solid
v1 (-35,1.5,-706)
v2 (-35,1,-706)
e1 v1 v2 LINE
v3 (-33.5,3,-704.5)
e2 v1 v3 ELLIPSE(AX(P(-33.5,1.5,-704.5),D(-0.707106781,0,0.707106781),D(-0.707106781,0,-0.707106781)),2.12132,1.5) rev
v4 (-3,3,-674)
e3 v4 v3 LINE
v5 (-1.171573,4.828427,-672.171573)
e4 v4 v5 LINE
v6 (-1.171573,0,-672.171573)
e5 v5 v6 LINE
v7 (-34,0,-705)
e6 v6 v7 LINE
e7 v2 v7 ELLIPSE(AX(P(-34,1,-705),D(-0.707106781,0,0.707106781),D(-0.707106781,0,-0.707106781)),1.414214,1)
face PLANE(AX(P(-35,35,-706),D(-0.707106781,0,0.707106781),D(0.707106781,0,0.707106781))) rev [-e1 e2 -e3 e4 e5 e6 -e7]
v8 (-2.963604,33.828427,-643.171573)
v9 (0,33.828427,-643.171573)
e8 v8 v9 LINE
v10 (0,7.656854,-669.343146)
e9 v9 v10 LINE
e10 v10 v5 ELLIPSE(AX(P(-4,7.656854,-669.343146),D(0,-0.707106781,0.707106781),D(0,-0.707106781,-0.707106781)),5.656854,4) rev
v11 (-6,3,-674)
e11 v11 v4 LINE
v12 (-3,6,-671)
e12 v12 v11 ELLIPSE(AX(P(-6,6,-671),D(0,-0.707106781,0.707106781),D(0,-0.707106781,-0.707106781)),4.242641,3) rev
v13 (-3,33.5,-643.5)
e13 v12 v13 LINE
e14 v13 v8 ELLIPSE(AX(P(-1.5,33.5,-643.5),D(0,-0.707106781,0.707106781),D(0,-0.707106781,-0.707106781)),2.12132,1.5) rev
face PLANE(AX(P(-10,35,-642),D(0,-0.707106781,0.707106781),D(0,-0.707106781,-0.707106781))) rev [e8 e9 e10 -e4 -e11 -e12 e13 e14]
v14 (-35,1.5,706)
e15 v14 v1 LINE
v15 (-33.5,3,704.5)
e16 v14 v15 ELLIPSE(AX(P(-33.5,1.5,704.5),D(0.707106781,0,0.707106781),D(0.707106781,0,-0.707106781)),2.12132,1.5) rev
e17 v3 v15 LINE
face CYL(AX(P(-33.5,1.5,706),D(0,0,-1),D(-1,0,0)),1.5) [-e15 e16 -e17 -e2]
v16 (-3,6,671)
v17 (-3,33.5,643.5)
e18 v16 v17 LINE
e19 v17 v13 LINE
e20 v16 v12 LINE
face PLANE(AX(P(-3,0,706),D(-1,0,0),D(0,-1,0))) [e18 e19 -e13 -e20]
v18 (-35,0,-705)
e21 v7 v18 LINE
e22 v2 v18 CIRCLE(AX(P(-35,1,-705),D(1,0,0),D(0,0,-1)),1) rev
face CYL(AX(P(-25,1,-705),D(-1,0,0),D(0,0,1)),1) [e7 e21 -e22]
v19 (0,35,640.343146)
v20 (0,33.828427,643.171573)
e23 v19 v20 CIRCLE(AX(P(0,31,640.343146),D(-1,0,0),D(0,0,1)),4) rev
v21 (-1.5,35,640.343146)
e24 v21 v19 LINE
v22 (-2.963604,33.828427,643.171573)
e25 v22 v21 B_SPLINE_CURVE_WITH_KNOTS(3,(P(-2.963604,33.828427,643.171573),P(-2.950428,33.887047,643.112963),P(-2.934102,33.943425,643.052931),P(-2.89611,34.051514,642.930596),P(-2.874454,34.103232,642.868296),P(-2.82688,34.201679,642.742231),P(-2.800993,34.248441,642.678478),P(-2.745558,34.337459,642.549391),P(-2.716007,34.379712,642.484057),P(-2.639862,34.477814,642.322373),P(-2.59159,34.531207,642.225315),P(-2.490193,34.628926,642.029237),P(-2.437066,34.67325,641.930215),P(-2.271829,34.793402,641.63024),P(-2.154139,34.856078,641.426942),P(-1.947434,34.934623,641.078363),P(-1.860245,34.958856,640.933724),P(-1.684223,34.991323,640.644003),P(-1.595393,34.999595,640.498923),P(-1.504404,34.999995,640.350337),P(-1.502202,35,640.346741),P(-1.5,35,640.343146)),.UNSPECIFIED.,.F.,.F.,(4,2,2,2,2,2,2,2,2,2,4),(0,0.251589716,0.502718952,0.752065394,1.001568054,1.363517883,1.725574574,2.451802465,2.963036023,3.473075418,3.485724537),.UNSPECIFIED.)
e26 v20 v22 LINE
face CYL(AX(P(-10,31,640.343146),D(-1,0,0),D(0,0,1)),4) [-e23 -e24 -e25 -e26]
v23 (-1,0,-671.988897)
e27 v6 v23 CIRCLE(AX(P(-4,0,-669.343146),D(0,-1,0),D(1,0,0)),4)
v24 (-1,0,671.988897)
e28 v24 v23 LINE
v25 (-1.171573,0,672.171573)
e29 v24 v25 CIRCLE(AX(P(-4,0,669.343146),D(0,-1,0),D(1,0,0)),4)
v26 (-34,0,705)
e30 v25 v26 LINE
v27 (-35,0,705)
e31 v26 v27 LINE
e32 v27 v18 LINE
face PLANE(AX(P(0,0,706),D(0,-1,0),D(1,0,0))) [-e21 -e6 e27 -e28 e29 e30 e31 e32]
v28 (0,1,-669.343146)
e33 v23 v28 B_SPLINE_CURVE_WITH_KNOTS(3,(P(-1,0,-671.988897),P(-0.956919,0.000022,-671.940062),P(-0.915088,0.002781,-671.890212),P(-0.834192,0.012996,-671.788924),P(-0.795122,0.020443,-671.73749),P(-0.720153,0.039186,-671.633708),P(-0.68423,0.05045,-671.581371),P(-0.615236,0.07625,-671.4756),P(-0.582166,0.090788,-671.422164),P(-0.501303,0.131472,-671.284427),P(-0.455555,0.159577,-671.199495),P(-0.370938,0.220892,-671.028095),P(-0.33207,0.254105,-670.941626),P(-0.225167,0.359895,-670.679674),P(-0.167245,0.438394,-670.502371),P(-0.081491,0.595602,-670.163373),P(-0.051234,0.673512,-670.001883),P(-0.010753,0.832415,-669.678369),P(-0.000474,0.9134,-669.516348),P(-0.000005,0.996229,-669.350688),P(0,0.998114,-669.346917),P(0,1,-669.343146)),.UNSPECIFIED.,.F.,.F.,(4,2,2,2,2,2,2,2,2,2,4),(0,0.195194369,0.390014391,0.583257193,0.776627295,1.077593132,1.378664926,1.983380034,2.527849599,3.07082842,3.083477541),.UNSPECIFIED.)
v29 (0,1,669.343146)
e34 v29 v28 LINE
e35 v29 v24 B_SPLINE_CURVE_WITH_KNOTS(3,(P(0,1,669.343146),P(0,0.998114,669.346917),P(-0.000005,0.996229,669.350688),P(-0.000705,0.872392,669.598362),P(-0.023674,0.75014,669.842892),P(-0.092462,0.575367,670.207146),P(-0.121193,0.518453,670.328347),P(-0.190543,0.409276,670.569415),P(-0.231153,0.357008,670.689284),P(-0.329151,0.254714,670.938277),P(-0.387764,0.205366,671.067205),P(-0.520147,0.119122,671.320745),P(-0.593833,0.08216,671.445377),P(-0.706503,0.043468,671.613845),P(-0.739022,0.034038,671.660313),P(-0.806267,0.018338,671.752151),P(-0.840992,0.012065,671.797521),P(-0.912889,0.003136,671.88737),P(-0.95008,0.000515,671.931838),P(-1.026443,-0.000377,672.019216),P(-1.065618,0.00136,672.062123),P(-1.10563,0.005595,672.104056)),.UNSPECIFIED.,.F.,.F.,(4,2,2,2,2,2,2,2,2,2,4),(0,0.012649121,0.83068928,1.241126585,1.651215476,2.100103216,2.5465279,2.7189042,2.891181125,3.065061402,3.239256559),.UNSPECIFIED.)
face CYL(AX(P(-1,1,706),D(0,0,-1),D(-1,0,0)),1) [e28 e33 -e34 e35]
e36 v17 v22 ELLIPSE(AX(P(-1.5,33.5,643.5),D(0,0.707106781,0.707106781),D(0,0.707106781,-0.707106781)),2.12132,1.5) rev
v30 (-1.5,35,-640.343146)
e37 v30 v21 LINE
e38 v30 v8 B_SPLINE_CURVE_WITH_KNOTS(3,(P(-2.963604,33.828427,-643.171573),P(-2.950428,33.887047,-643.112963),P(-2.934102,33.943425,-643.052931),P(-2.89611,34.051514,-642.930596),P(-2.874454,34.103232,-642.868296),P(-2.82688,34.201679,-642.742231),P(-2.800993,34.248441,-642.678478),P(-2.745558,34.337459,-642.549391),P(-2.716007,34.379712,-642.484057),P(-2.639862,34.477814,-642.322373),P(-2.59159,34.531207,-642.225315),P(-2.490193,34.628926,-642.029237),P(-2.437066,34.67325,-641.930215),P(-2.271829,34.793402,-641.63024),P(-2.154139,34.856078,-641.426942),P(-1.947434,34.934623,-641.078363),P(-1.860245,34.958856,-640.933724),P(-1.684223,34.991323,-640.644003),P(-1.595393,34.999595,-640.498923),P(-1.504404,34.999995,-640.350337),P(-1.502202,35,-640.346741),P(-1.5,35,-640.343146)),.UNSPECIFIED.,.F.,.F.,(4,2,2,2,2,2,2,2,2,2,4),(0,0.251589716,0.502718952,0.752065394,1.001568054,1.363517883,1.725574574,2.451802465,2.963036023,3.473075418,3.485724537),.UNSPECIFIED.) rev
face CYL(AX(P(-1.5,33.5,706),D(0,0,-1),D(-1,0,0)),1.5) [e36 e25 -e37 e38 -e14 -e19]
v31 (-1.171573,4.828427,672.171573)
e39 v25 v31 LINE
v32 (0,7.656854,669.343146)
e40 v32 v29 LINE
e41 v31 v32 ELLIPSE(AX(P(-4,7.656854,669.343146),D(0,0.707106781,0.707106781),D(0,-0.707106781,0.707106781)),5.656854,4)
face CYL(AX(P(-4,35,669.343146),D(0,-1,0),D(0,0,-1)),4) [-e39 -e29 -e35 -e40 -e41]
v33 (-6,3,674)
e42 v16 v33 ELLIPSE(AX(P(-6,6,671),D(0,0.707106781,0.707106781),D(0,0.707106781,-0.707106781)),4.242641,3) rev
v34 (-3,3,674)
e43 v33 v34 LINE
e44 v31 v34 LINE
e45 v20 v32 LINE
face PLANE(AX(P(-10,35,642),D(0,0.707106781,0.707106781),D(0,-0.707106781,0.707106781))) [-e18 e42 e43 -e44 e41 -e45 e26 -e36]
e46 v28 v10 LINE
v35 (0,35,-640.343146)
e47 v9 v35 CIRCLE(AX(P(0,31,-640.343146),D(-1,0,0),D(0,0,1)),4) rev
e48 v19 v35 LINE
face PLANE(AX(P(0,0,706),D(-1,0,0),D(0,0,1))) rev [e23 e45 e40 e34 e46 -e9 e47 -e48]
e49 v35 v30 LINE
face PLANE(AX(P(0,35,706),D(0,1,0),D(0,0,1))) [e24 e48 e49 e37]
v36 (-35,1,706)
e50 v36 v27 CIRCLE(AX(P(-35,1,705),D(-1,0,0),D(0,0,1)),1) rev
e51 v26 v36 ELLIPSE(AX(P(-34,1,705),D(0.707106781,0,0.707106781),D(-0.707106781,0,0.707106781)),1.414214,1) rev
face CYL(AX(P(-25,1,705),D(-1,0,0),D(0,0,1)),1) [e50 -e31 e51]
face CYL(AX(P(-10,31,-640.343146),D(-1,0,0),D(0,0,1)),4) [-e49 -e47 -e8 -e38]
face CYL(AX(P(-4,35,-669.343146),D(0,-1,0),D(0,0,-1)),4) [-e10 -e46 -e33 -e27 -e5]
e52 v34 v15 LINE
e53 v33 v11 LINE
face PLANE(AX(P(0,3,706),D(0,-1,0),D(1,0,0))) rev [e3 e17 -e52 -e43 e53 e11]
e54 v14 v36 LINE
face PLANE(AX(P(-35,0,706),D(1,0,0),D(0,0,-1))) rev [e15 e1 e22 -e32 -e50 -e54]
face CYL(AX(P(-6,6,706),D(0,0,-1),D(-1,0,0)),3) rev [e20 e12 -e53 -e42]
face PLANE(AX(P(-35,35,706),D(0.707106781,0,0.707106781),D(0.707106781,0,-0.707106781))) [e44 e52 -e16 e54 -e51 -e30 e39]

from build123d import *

# Parameters (mm, degrees)
BOSS_EXTRUDE1_DEPTH = 706
FILLET1_R           = 1.5
CUT_EXTRUDE1_DEPTH  = 708.733000502
CUT_EXTRUDE2_DEPTH  = 10
FILLET2_R           = 4
FILLET3_R           = 4
FILLET4_R           = 4
FILLET5_R           = 4
CUT_EXTRUDE3_DEPTH  = 10


with BuildPart() as part:
    # Sketch1 → Boss-Extrude1 (new, symmetric)
    with BuildSketch(Plane.XY):
        with BuildLine():
            Line((-1, 0), (-35, 0))
            Line((-35, 0), (-35, 3))
            Line((-35, 3), (-6, 3))
            ThreePointArc((-6, 3), (-3.878679656, 3.878679656), (-3, 6))
            Line((-3, 6), (-3, 35))
            Line((-3, 35), (0, 35))
            Line((0, 35), (0, 1))
            ThreePointArc((0, 1), (-0.292893219, 0.292893219), (-1, 0))
        make_face()
    extrude(amount=BOSS_EXTRUDE1_DEPTH, both=True)

    # Fillet1
    fillet1_edges = [part.edges().sort_by_distance(p)[0] for p in [
        (-35, 3, 0),
        (-3, 35, 0),
    ]]
    fillet(fillet1_edges, radius=FILLET1_R)

    # Sketch2 → Cut-Extrude1 (cut, through all)
    with BuildSketch(Plane.XZ):
        Polygon((-35, -706), (0, -671), (0, -706), align=None)
    cut_extrude1 = extrude(amount=-CUT_EXTRUDE1_DEPTH, mode=Mode.SUBTRACT)

    # Sketch3 → Cut-Extrude2 (cut)
    with BuildSketch(Plane(origin=(0, 0, 0), x_dir=(0, 0, -1), z_dir=(1, 0, 0))):
        Polygon((642, 35), (674, 3), (706, 3), (674, 35), align=None)
    cut_extrude2 = extrude(amount=-CUT_EXTRUDE2_DEPTH, mode=Mode.SUBTRACT)

    # Mirror1: Cut-Extrude1, Cut-Extrude2 across plane
    add(cut_extrude1.mirror(Plane.XY), mode=Mode.SUBTRACT)
    add(cut_extrude2.mirror(Plane.XY), mode=Mode.SUBTRACT)

    # Fillet2
    # the kernel refuses this fillet: 4 mm, written as the material it takes off along each edge
    with BuildSketch(Plane(origin=(4.142135624, 35, -642), x_dir=(0, 0, 1), z_dir=(-1, 0, 0))) as fillet2_piece_1:
        with BuildLine():
            CenterArc((FILLET2_R * 0.414213562373, -FILLET2_R), FILLET2_R, 90, 45)
            Line((-FILLET2_R * 0.292893218813, -FILLET2_R * 0.292893218813), (0, 0))
            Line((0, 0), (FILLET2_R * 0.414213562373, 0))
        make_face()
    extrude(amount=9.784271247, mode=Mode.SUBTRACT)

    # Fillet3
    # the kernel refuses this fillet: 4 mm, written as the material it takes off along each edge
    with BuildSketch(Plane(origin=(0, -3.142135624, -671), x_dir=(-0.707106781186569, 0, -0.707106781186526), z_dir=(0, 1, 0))) as fillet3_piece_1:
        with BuildLine():
            CenterArc((FILLET3_R * 0.414213562373, FILLET3_R), FILLET3_R, 225, 45)
            Line((-FILLET3_R * 0.292893218813, FILLET3_R * 0.292893218813), (0, 0))
            Line((0, 0), (FILLET3_R * 0.414213562373, 0))
        make_face()
    extrude(amount=13.284271247, mode=Mode.SUBTRACT)

    # Fillet4
    # the kernel refuses this fillet: 4 mm, written as the material it takes off along each edge
    with BuildSketch(Plane(origin=(0, -3.142135624, 671), x_dir=(-0.707106781186569, 0, 0.707106781186526), z_dir=(0, 1, 0))) as fillet4_piece_1:
        with BuildLine():
            CenterArc((FILLET4_R * 0.414213562373, -FILLET4_R), FILLET4_R, 90, 45)
            Line((-FILLET4_R * 0.292893218813, -FILLET4_R * 0.292893218813), (0, 0))
            Line((0, 0), (FILLET4_R * 0.414213562373, 0))
        make_face()
    extrude(amount=13.284271247, mode=Mode.SUBTRACT)

    # Fillet5
    # the kernel refuses this fillet: 4 mm, written as the material it takes off along each edge
    with BuildSketch(Plane(origin=(4.142135624, 35, 642), x_dir=(0, -0.7071067811865432, 0.7071067811865518), z_dir=(-1, 0, 0))) as fillet5_piece_1:
        with BuildLine():
            CenterArc((FILLET5_R * 0.414213562373, -FILLET5_R), FILLET5_R, 90, 45)
            Line((-FILLET5_R * 0.292893218813, -FILLET5_R * 0.292893218813), (0, 0))
            Line((0, 0), (FILLET5_R * 0.414213562373, 0))
        make_face()
    extrude(amount=9.784271247, mode=Mode.SUBTRACT)

    # Sketch4 → Cut-Extrude3 (cut)
    with BuildSketch(Plane.ZY.offset(35)):
        Polygon((711.147996861, -1.5), (711.147996861, 1.5), (706, 1.5), (706, 1), (706, 0), (705, 0), (700.876909591, 0), (700.876909591, -1.5), align=None)
        with BuildLine():
            Line((706, 0), (706, 1))
            ThreePointArc((706, 1), (705.707106781, 0.292893219), (705, 0))
            Line((705, 0), (706, 0))
        make_face()
    cut_extrude3 = extrude(amount=-CUT_EXTRUDE3_DEPTH, mode=Mode.SUBTRACT)

    # Mirror2: Cut-Extrude3 across plane
    add(cut_extrude3.mirror(Plane.XY), mode=Mode.SUBTRACT)


solid = part.part
